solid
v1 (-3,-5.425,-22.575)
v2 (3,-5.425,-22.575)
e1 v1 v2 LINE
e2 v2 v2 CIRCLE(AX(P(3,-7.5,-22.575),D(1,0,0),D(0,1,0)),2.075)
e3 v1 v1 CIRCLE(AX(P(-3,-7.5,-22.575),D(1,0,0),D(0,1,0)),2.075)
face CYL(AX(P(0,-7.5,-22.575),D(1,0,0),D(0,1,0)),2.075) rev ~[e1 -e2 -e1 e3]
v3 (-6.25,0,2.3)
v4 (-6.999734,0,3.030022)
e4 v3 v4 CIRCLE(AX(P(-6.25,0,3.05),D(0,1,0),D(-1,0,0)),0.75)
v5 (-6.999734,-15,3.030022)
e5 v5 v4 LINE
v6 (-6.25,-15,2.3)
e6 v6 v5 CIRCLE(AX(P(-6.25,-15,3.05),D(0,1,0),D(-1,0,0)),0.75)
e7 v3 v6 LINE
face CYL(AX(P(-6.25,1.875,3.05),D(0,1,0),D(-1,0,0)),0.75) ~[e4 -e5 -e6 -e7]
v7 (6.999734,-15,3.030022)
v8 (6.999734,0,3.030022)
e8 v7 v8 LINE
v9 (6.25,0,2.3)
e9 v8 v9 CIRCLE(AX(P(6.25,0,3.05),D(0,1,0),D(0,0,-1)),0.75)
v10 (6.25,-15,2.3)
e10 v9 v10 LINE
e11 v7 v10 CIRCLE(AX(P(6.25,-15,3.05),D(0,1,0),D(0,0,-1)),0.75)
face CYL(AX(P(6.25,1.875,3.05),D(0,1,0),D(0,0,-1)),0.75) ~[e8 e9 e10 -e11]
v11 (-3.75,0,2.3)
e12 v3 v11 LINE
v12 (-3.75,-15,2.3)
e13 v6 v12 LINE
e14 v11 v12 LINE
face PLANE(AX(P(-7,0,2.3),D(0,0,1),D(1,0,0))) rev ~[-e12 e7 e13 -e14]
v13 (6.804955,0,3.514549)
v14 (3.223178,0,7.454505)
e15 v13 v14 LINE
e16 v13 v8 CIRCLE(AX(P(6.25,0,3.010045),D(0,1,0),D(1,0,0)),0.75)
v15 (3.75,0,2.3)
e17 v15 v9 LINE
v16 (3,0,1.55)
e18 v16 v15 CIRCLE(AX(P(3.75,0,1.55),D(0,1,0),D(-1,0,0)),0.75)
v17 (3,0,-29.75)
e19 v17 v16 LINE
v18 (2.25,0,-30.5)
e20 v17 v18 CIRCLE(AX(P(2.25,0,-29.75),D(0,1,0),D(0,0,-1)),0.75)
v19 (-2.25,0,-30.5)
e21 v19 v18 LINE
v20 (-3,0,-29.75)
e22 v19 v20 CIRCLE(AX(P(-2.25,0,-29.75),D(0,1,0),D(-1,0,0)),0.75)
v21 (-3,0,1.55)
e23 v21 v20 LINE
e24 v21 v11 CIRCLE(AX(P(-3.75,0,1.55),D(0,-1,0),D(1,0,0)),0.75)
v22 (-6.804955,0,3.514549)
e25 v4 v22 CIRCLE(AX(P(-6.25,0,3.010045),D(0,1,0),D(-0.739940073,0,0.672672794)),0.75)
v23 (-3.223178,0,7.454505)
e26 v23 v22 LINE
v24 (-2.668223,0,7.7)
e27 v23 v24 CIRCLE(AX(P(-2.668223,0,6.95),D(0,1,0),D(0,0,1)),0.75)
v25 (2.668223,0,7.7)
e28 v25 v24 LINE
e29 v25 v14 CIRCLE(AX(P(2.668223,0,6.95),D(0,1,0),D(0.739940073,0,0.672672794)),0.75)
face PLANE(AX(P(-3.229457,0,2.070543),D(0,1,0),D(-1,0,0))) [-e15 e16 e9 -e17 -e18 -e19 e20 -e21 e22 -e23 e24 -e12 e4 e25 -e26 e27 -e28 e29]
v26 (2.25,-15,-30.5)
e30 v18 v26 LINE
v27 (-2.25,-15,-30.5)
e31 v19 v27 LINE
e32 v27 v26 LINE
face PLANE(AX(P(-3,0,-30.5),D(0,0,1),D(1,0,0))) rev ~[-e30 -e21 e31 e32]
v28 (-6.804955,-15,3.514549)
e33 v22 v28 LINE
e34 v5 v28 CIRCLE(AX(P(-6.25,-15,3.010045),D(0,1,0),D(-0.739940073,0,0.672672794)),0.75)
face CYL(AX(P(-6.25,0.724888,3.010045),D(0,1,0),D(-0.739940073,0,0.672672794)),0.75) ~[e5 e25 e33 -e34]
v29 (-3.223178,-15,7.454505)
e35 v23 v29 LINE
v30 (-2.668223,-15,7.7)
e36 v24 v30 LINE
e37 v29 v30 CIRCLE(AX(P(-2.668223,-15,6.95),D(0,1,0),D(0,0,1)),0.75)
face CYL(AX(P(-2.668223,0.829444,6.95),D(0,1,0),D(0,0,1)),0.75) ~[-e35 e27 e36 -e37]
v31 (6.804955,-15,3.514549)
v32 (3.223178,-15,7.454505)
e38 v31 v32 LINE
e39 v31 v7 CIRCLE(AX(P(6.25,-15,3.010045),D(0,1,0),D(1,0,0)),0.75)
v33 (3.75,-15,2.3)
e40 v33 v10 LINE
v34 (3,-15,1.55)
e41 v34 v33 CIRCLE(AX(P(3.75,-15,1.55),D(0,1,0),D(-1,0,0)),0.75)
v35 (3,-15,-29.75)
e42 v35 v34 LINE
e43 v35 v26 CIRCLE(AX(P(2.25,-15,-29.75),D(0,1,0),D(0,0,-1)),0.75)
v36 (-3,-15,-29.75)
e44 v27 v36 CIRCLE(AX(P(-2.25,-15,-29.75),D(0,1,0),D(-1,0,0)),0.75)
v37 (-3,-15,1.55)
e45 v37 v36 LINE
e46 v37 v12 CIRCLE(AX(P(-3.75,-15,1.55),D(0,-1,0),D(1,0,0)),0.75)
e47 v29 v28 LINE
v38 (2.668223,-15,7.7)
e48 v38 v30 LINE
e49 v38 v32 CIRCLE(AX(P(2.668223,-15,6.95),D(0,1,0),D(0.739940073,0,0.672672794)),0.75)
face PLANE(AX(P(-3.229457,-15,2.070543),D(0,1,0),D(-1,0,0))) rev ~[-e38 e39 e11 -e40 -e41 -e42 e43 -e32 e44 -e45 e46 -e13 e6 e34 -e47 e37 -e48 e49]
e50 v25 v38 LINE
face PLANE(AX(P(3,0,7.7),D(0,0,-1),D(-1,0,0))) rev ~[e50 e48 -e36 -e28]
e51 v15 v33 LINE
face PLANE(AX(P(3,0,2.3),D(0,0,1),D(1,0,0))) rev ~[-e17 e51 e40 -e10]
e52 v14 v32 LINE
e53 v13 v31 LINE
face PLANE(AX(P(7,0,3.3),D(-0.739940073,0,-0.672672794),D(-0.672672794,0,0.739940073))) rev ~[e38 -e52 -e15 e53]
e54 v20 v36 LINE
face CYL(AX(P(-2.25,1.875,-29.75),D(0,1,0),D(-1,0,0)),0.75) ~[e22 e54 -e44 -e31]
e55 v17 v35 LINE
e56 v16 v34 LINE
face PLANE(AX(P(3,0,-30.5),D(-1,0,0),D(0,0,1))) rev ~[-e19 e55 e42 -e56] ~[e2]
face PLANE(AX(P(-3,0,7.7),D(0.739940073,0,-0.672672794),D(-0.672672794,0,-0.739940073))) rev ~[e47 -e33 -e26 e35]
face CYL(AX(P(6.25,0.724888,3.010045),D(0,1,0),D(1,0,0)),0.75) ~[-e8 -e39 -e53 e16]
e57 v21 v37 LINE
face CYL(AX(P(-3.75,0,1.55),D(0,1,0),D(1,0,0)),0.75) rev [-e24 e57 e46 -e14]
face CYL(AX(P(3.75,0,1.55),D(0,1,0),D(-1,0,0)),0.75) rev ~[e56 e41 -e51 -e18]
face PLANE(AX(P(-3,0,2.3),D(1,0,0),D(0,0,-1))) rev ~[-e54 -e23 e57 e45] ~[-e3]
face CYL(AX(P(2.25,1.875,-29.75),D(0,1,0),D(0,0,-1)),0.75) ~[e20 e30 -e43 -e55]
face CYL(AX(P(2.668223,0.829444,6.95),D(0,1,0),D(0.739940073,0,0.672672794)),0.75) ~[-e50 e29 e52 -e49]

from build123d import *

# Parameters (mm, degrees)
F0_W        = 6
F0_H        = 20.5
F0_H_2      = 4
F0_H_3      = 6
F1_DEPTH    = 15
F2_T1_DEPTH = 15
F2_T3_DEPTH = 16.4497757802
F2_T5_DEPTH = 16.6588870729
F2_T7_DEPTH = 18.75
F3_R        = 2.075
F4_DEPTH    = 12.5


# Not quite as in the source:
# - a fillet or chamfer that OpenCascade refuses, or shapes differently, is made with other operations: its cross-section is extruded or revolved along the edge and cut away or added


with BuildPart() as f1:
    # F0 (on Front) → F1 (new body)
    with BuildSketch(Plane.XZ):
        Polygon((-3, 2.3), (-3, 0), (3, 0), (3, 2.3), (7, 2.3), (7, 3.3), (3, 7.7), (-3, 7.7), (-7, 3.3), (-7, 2.3), align=None)
        with Locations((0, -10.25)):
            Rectangle(F0_W, F0_H)
        with Locations((0, -22.5)):
            Rectangle(F0_W, F0_H_2)
        with Locations((0, -27.5)):
            Rectangle(F0_W, F0_H_3)
    extrude(amount=F1_DEPTH)

    # F2: fillet of radius 0.75 on 10 edges, made by hand

    # F2_s2 → F2_t1 (join)
    with BuildSketch(Plane.XZ):
        with BuildLine():
            ThreePointArc((-3, 1.55), (-3.2196699141, 2.0803300859), (-3.75, 2.3))
            Line((-3.75, 2.3), (-3, 2.3))
            Line((-3, 2.3), (-3, 1.55))
        make_face()
        with BuildLine():
            ThreePointArc((3, 1.55), (3.2196699141, 2.0803300859), (3.75, 2.3))
            Line((3.75, 2.3), (3, 2.3))
            Line((3, 2.3), (3, 1.55))
        make_face()
    extrude(amount=F2_T1_DEPTH)

    # F2_s4 → F2_t3 (cut)
    with BuildSketch(Plane.XZ.offset(-0.7248878901)):
        with BuildLine():
            ThreePointArc((7, 3.010044844), (6.9495413824, 3.2804923515), (6.804955055, 3.5145494394))
            Line((6.804955055, 3.5145494394), (7, 3.3))
            Line((7, 3.3), (7, 3.010044844))
        make_face()
        with BuildLine():
            ThreePointArc((-6.804955055, 3.5145494394), (-6.9495413824, 3.2804923515), (-7, 3.010044844))
            Line((-7, 3.010044844), (-7, 3.3))
            Line((-7, 3.3), (-6.804955055, 3.5145494394))
        make_face()
    extrude(amount=F2_T3_DEPTH, mode=Mode.SUBTRACT)

    # F2_s6 → F2_t5 (cut)
    with BuildSketch(Plane.XZ.offset(-0.8294435365)):
        with BuildLine():
            ThreePointArc((3.2231776405, 7.4545045955), (2.971637774, 7.6358857218), (2.6682225854, 7.7))
            Line((2.6682225854, 7.7), (3, 7.7))
            Line((3, 7.7), (3.2231776405, 7.4545045955))
        make_face()
        with BuildLine():
            ThreePointArc((-2.6682225854, 7.7), (-2.971637774, 7.6358857218), (-3.2231776405, 7.4545045955))
            Line((-3.2231776405, 7.4545045955), (-3, 7.7))
            Line((-3, 7.7), (-2.6682225854, 7.7))
        make_face()
    extrude(amount=F2_T5_DEPTH, mode=Mode.SUBTRACT)

    # F2_s8 → F2_t7 (cut)
    with BuildSketch(Plane.XZ.offset(-1.875)):
        with BuildLine():
            ThreePointArc((-7, 3.05), (-6.7803300859, 2.5196699141), (-6.25, 2.3))
            Line((-6.25, 2.3), (-7, 2.3))
            Line((-7, 2.3), (-7, 3.05))
        make_face()
        with BuildLine():
            ThreePointArc((6.25, 2.3), (6.7803300859, 2.5196699141), (7, 3.05))
            Line((7, 3.05), (7, 2.3))
            Line((7, 2.3), (6.25, 2.3))
        make_face()
        with BuildLine():
            ThreePointArc((2.25, -30.5), (2.7803300859, -30.2803300859), (3, -29.75))
            Line((3, -29.75), (3, -30.5))
            Line((3, -30.5), (2.25, -30.5))
        make_face()
        with BuildLine():
            ThreePointArc((-3, -29.75), (-2.7803300859, -30.2803300859), (-2.25, -30.5))
            Line((-2.25, -30.5), (-3, -30.5))
            Line((-3, -30.5), (-3, -29.75))
        make_face()
    extrude(amount=F2_T7_DEPTH, mode=Mode.SUBTRACT)

    # F3 (on Right) → F4 (cut, symmetric)
    with BuildSketch(Plane.YZ):
        with Locations((-7.5, -22.575)):
            Circle(F3_R)
    extrude(amount=F4_DEPTH, both=True, mode=Mode.SUBTRACT)


solid = f1.part
